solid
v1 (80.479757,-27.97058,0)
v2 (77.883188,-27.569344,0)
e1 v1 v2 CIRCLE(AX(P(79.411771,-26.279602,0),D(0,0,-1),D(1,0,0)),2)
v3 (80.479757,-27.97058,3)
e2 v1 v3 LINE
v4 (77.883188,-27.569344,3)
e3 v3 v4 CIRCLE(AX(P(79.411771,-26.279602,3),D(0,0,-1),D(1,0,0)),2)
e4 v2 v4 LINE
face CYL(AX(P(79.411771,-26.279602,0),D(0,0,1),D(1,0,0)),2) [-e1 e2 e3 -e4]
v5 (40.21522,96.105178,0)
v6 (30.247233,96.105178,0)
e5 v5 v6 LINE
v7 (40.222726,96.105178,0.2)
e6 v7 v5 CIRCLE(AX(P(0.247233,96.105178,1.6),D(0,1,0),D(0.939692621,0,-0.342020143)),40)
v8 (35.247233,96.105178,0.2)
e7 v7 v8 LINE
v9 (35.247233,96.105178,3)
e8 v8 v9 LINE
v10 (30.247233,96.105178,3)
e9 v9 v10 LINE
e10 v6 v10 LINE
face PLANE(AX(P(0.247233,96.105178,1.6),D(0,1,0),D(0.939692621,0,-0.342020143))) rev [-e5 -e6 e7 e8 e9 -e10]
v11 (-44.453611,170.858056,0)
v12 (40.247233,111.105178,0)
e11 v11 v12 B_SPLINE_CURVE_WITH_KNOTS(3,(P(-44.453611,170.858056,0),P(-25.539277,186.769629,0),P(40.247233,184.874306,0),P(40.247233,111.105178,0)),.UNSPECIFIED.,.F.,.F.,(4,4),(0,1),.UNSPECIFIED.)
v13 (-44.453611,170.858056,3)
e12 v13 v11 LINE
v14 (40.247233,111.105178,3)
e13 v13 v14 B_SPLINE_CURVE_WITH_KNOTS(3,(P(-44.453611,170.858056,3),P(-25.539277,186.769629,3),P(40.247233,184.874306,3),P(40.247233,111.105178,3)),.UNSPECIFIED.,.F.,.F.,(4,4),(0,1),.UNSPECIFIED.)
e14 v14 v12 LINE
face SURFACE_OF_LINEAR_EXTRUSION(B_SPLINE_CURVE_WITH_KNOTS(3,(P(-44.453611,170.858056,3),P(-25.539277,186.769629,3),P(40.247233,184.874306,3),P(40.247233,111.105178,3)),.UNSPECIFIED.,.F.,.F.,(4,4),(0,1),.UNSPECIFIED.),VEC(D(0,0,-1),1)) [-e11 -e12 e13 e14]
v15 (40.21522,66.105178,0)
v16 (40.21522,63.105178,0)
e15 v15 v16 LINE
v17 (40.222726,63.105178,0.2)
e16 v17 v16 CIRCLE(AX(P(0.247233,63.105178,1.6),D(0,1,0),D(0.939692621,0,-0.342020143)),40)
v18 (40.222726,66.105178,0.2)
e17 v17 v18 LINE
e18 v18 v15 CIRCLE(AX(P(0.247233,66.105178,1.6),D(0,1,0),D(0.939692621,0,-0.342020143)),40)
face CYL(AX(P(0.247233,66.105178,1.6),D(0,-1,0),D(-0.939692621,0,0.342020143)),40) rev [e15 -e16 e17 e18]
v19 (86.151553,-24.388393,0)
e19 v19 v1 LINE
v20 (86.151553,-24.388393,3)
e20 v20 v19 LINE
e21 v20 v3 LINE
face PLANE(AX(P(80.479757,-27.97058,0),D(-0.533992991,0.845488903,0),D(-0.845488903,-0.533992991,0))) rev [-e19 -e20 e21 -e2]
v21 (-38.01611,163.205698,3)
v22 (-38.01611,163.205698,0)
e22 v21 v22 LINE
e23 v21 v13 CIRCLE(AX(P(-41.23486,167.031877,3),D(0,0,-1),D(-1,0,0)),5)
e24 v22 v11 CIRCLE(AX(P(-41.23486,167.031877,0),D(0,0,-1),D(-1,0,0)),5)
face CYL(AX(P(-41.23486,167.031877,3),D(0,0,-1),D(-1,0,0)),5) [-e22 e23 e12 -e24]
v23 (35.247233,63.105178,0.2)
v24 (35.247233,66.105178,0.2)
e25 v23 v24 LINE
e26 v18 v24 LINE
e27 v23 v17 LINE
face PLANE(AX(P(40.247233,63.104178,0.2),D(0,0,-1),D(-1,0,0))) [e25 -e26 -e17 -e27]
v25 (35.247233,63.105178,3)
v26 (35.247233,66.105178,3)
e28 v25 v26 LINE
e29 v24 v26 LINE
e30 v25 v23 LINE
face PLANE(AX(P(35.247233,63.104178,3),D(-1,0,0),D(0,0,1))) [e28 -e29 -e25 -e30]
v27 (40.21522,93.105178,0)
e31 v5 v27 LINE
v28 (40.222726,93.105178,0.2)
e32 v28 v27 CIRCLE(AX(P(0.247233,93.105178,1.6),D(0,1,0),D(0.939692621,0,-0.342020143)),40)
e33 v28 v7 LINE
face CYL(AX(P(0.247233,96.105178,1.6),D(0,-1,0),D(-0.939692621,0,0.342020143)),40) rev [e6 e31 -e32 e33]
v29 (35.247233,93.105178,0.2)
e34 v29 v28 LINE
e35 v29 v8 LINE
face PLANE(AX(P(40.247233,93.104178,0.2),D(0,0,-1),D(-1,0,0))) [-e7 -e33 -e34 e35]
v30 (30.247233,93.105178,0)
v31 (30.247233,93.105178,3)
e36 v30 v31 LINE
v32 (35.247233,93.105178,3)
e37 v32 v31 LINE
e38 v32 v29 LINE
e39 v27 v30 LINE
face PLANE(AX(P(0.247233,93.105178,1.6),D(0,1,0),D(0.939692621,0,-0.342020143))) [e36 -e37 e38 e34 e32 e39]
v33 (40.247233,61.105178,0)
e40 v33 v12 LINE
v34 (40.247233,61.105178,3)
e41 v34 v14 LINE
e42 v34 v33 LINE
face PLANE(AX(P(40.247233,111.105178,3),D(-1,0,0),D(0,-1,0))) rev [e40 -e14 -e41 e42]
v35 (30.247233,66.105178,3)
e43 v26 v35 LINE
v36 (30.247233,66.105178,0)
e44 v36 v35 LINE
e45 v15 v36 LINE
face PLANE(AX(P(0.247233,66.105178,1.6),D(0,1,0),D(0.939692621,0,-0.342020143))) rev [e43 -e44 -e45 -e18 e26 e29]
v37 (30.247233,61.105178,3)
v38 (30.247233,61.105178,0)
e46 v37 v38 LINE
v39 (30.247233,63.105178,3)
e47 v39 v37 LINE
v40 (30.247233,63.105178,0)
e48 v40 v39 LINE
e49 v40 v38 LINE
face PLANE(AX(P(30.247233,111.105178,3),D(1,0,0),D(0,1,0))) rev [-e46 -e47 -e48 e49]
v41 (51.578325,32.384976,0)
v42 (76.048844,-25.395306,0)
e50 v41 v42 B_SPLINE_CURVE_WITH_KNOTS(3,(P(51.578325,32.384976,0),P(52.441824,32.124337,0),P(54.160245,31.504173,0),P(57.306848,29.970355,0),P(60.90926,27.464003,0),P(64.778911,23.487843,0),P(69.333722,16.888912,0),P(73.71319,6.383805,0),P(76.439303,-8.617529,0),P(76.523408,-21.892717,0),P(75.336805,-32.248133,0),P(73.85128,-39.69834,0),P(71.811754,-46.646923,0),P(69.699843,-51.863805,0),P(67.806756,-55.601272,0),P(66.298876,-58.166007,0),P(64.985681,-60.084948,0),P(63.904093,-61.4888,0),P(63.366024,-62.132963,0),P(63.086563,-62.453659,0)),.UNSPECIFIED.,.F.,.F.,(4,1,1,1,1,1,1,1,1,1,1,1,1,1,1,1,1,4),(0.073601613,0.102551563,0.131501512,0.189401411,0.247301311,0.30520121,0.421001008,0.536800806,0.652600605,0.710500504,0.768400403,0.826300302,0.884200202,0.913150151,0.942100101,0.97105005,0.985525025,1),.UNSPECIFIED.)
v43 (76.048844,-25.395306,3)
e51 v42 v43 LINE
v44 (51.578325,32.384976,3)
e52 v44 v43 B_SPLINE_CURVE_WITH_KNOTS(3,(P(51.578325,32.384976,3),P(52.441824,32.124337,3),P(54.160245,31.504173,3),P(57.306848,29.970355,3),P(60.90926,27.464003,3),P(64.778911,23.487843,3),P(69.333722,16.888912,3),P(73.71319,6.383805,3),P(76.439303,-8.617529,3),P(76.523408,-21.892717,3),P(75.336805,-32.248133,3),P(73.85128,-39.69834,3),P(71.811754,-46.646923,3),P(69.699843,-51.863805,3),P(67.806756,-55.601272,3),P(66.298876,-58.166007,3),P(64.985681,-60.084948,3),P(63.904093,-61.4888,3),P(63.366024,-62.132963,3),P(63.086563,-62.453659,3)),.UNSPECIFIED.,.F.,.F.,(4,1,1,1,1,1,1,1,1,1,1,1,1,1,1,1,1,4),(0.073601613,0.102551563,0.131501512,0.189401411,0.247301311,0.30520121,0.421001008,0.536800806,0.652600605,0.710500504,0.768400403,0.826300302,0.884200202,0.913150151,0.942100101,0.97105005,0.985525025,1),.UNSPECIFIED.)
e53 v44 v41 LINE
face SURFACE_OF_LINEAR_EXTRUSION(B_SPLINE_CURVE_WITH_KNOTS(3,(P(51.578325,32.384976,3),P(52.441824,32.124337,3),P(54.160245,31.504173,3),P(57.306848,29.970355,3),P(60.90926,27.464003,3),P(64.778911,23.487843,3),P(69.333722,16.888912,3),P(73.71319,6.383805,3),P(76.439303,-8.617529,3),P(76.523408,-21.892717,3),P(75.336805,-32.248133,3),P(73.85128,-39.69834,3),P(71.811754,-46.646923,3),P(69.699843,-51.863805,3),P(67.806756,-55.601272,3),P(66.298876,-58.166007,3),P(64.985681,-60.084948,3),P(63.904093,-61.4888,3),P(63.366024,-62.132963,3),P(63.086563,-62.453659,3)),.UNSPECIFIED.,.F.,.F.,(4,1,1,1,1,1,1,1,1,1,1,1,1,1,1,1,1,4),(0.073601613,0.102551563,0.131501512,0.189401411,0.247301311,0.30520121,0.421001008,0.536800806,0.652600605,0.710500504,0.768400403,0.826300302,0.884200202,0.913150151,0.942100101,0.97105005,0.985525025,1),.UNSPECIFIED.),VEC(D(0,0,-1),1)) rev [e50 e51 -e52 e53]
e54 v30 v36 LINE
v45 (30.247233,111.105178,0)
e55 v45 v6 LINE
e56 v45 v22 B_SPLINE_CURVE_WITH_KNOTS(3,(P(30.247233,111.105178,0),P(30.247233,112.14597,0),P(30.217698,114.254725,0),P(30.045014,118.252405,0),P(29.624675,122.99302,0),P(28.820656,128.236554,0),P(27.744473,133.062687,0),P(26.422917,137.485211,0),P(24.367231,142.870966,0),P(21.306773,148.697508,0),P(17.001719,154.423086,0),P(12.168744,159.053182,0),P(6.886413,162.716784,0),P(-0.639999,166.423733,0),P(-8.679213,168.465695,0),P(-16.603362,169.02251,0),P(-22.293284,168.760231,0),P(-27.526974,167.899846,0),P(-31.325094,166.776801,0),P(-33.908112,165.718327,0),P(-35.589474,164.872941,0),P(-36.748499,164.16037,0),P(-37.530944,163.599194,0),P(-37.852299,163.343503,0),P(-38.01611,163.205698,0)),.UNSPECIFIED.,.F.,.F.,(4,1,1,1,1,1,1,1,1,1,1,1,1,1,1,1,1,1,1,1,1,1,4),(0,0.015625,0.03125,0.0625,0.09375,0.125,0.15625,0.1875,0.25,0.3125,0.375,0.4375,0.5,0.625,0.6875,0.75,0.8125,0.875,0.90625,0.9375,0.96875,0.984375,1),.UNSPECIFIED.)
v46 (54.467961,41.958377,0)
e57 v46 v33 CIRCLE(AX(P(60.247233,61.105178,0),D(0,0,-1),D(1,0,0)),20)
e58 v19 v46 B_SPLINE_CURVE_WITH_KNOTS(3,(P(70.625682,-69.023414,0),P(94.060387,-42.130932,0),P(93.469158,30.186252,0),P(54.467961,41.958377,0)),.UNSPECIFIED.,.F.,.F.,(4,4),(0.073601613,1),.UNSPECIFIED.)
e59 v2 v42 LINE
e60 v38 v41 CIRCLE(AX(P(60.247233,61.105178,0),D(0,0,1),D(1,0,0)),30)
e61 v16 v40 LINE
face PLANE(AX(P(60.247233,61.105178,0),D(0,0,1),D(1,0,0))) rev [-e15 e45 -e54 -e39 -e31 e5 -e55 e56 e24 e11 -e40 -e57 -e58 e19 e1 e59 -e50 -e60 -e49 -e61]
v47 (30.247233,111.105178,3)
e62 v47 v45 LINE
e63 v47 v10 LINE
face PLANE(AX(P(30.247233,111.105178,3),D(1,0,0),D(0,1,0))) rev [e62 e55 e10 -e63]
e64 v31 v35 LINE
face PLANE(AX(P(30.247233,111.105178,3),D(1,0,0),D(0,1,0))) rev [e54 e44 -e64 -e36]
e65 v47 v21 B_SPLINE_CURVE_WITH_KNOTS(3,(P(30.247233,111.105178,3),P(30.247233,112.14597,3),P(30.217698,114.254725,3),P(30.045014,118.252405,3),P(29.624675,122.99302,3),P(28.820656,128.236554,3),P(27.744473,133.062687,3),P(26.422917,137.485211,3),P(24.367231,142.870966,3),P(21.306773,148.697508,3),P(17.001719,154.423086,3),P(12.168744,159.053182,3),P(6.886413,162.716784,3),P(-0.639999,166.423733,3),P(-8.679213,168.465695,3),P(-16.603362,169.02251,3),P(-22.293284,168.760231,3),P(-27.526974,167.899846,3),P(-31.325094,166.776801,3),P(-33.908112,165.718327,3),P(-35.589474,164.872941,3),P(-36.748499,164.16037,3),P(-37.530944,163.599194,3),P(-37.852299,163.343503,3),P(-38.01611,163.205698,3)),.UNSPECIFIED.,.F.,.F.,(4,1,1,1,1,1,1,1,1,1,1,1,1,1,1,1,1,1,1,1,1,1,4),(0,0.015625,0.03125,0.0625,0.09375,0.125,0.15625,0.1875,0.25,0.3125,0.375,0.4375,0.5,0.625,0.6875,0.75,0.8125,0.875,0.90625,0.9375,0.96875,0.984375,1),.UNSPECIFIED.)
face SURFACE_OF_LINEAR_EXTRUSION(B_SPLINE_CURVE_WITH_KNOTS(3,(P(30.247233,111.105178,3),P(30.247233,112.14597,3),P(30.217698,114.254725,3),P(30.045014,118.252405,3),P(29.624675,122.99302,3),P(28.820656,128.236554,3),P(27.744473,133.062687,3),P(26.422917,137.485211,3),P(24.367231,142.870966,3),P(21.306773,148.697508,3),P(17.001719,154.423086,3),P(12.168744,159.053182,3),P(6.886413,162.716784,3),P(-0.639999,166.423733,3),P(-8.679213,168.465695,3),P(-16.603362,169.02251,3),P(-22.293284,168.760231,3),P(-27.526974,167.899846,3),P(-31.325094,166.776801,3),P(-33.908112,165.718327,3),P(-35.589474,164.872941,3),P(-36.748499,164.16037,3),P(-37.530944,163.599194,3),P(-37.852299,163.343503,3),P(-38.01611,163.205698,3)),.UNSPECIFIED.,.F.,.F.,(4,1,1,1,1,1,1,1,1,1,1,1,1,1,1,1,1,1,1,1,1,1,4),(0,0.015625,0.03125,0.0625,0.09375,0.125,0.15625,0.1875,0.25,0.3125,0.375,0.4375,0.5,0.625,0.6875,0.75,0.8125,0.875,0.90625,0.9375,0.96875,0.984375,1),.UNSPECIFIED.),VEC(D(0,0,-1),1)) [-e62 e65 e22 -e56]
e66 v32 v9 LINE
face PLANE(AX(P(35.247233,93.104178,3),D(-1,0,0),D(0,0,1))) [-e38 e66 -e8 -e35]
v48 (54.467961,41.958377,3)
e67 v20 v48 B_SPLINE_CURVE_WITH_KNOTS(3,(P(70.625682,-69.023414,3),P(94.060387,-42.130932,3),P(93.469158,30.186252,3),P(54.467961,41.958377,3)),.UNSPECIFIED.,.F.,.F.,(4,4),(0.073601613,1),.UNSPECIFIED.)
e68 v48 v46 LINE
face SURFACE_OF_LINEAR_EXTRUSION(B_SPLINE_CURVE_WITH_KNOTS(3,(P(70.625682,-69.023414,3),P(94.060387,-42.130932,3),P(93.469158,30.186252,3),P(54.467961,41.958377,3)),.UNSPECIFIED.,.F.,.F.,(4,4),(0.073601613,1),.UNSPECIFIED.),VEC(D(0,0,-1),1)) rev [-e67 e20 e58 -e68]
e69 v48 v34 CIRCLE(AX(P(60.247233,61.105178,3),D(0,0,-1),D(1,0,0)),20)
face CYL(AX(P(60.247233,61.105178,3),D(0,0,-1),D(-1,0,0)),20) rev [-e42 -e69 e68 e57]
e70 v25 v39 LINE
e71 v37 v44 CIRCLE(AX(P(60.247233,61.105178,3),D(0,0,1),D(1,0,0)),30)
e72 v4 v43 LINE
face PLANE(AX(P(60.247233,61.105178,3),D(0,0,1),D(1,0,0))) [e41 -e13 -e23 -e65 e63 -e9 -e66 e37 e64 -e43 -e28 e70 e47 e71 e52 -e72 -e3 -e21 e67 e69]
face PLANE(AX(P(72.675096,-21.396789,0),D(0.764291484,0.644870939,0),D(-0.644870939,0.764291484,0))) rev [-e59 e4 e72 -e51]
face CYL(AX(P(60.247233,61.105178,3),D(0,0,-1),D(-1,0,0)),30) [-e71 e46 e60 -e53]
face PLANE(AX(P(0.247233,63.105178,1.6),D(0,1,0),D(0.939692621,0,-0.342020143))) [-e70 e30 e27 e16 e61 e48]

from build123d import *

# Parameters (mm, degrees)
BOSS_EXTRU_2_DEPTH      = 3
ENL_V_MAT_EXTRU_1_DEPTH = 141.768934672
EMPREINTE1_START        = 63.105178129
EMPREINTE1_DEPTH        = 3
EMPREINTE1_START_2      = 93.105178129
EMPREINTE1_2_DEPTH      = 3
BOSS_EXTRU_3_DEPTH      = 3


# Read off the part's stored shape, not the designer's step: Empreinte1
with BuildPart() as part:
    # Esquisse1 → Boss.-Extru.2 (new body)
    with BuildSketch(Plane.XY):
        with BuildLine():
            Line((40.247233076, 111.105178129), (40.247233076, 61.105178129))
            ThreePointArc((40.247233076, 61.105178129), (44.191308202, 49.180108885), (54.467960723, 41.95837654))
            add(Edge.make_bspline(
                [(54.467960723, 41.95837654), (93.469157599, 30.186251687), (94.060386504, -42.130931626), (70.625681641, -69.023414216)],
                knots=[0.073601613, 0.073601613, 0.073601613, 0.073601613, 1, 1, 1, 1], degree=3))
            Line((70.625681641, -69.023414216), (63.086562616, -62.453658944))
            add(Edge.make_bspline(
                [(51.578324546, 32.384975746), (52.441823747, 32.124337068), (54.160244695, 31.504173294), (57.306848095, 29.97035453), (60.909260152, 27.464002891), (64.778911343, 23.487842732), (69.333722485, 16.888912111), (73.713189985, 6.383804922), (76.439302823, -8.617528818), (76.523407917, -21.892716717), (75.336804817, -32.248132674), (73.851279993, -39.698340102), (71.811754469, -46.646923176), (69.699842941, -51.863805262), (67.806756273, -55.601272185), (66.298875889, -58.166006571), (64.985680603, -60.08494816), (63.904092742, -61.488799964), (63.366023798, -62.13296342), (63.086562616, -62.453658944)],
                knots=[0.073601613, 0.073601613, 0.073601613, 0.073601613, 0.102551563, 0.131501512, 0.189401411, 0.247301311, 0.30520121, 0.421001008, 0.536800806, 0.652600605, 0.710500504, 0.768400403, 0.826300302, 0.884200202, 0.913150151, 0.942100101, 0.97105005, 0.985525025, 1, 1, 1, 1], degree=3))
            ThreePointArc((51.578324546, 32.384975746), (36.163345766, 43.217574263), (30.247233076, 61.105178129))
            Line((30.247233076, 61.105178129), (30.247233076, 111.105178129))
            Line((30.247233076, 111.105178129), (40.247233076, 111.105178129))
        make_face()
    extrude(amount=BOSS_EXTRU_2_DEPTH)

    # Esquisse2 → Enlèv. mat.-Extru.1 (cut, through all)
    with BuildSketch(Plane.XY.offset(3)):
        with BuildLine():
            Line((58.604840791, -65.718091867), (72.675095618, -21.396789164))
            Line((72.675095618, -21.396789164), (77.883188433, -27.569343611))
            ThreePointArc((77.883188433, -27.569343611), (79.106345528, -28.256142913), (80.479757382, -27.970579539))
            Line((80.479757382, -27.970579539), (87.91787168, -23.272823141))
            Line((87.91787168, -23.272823141), (76.157367596, -75.355055511))
            Line((76.157367596, -75.355055511), (58.604840791, -65.718091867))
        make_face()
    extrude(amount=-ENL_V_MAT_EXTRU_1_DEPTH, mode=Mode.SUBTRACT)

    # Empreinte1 outline → Empreinte1 (cut)
    with BuildSketch(Plane(origin=(0, 0, 0), x_dir=(1, 0, 0), z_dir=(0, 1, 0)).offset(EMPREINTE1_START)):
        with BuildLine():
            ThreePointArc((40.222725568, -0.2), (40.219098005, -0.099995306), (40.215220265, 0))
            Line((40.215220265, 0), (30.247233076, 0))
            Line((30.247233076, 0), (30.247233076, -3))
            Line((30.247233076, -3), (35.247233076, -3))
            Line((35.247233076, -3), (35.247233076, -0.2))
            Line((35.247233076, -0.2), (40.222725568, -0.2))
        make_face()
    extrude(amount=EMPREINTE1_DEPTH, mode=Mode.SUBTRACT)

    # Empreinte1 2 outline → Empreinte1 2 (cut)
    with BuildSketch(Plane(origin=(0, 0, 0), x_dir=(1, 0, 0), z_dir=(0, 1, 0)).offset(EMPREINTE1_START_2)):
        with BuildLine():
            ThreePointArc((40.222725568, -0.2), (40.219098005, -0.099995306), (40.215220265, 0))
            Line((40.215220265, 0), (30.247233076, 0))
            Line((30.247233076, 0), (30.247233076, -3))
            Line((30.247233076, -3), (35.247233076, -3))
            Line((35.247233076, -3), (35.247233076, -0.2))
            Line((35.247233076, -0.2), (40.222725568, -0.2))
        make_face()
    extrude(amount=EMPREINTE1_2_DEPTH, mode=Mode.SUBTRACT)

    # Esquisse3 → Boss.-Extru.3 (add)
    with BuildSketch(Plane(origin=(0, 0, 0), x_dir=(-1, 0, 0), z_dir=(0, 0, -1))):
        with BuildLine():
            Line((-40.247233076, 111.105178129), (-30.247233076, 111.105178129))
            add(Edge.make_bspline(
                [(-30.247233076, 111.105178129), (-30.247233076, 112.14596965), (-30.217698493, 114.25472522), (-30.045014328, 118.252405482), (-29.624674548, 122.993020115), (-28.820656407, 128.236554261), (-27.74447291, 133.062686625), (-26.422917169, 137.485210513), (-24.367231012, 142.870966444), (-21.306772788, 148.697507946), (-17.00171943, 154.423085647), (-12.168743747, 159.053182078), (-6.886412749, 162.716784457), (0.639998699, 166.423733084), (8.67921262, 168.46569452), (16.603362122, 169.022509829), (22.293283685, 168.760231201), (27.526974489, 167.899846277), (31.325094184, 166.77680064), (33.908111954, 165.718326704), (35.589474071, 164.872941274), (36.748498996, 164.160369864), (37.530944286, 163.599193527), (37.852299425, 163.343502605), (38.016109762, 163.205698113)],
                knots=[0, 0, 0, 0, 0.015625, 0.03125, 0.0625, 0.09375, 0.125, 0.15625, 0.1875, 0.25, 0.3125, 0.375, 0.4375, 0.5, 0.625, 0.6875, 0.75, 0.8125, 0.875, 0.90625, 0.9375, 0.96875, 0.984375, 1, 1, 1, 1], degree=3))
            ThreePointArc((38.016109762, 163.205698113), (45.061039216, 163.813126294), (44.453611035, 170.858055748))
            add(Edge.make_bspline(
                [(-40.247233076, 111.105178129), (-40.247233076, 184.874305638), (25.539277275, 186.769628817), (44.453611035, 170.858055748)],
                knots=[0, 0, 0, 0, 1, 1, 1, 1], degree=3))
        make_face()
    extrude(amount=-BOSS_EXTRU_3_DEPTH)


solid = part.part
